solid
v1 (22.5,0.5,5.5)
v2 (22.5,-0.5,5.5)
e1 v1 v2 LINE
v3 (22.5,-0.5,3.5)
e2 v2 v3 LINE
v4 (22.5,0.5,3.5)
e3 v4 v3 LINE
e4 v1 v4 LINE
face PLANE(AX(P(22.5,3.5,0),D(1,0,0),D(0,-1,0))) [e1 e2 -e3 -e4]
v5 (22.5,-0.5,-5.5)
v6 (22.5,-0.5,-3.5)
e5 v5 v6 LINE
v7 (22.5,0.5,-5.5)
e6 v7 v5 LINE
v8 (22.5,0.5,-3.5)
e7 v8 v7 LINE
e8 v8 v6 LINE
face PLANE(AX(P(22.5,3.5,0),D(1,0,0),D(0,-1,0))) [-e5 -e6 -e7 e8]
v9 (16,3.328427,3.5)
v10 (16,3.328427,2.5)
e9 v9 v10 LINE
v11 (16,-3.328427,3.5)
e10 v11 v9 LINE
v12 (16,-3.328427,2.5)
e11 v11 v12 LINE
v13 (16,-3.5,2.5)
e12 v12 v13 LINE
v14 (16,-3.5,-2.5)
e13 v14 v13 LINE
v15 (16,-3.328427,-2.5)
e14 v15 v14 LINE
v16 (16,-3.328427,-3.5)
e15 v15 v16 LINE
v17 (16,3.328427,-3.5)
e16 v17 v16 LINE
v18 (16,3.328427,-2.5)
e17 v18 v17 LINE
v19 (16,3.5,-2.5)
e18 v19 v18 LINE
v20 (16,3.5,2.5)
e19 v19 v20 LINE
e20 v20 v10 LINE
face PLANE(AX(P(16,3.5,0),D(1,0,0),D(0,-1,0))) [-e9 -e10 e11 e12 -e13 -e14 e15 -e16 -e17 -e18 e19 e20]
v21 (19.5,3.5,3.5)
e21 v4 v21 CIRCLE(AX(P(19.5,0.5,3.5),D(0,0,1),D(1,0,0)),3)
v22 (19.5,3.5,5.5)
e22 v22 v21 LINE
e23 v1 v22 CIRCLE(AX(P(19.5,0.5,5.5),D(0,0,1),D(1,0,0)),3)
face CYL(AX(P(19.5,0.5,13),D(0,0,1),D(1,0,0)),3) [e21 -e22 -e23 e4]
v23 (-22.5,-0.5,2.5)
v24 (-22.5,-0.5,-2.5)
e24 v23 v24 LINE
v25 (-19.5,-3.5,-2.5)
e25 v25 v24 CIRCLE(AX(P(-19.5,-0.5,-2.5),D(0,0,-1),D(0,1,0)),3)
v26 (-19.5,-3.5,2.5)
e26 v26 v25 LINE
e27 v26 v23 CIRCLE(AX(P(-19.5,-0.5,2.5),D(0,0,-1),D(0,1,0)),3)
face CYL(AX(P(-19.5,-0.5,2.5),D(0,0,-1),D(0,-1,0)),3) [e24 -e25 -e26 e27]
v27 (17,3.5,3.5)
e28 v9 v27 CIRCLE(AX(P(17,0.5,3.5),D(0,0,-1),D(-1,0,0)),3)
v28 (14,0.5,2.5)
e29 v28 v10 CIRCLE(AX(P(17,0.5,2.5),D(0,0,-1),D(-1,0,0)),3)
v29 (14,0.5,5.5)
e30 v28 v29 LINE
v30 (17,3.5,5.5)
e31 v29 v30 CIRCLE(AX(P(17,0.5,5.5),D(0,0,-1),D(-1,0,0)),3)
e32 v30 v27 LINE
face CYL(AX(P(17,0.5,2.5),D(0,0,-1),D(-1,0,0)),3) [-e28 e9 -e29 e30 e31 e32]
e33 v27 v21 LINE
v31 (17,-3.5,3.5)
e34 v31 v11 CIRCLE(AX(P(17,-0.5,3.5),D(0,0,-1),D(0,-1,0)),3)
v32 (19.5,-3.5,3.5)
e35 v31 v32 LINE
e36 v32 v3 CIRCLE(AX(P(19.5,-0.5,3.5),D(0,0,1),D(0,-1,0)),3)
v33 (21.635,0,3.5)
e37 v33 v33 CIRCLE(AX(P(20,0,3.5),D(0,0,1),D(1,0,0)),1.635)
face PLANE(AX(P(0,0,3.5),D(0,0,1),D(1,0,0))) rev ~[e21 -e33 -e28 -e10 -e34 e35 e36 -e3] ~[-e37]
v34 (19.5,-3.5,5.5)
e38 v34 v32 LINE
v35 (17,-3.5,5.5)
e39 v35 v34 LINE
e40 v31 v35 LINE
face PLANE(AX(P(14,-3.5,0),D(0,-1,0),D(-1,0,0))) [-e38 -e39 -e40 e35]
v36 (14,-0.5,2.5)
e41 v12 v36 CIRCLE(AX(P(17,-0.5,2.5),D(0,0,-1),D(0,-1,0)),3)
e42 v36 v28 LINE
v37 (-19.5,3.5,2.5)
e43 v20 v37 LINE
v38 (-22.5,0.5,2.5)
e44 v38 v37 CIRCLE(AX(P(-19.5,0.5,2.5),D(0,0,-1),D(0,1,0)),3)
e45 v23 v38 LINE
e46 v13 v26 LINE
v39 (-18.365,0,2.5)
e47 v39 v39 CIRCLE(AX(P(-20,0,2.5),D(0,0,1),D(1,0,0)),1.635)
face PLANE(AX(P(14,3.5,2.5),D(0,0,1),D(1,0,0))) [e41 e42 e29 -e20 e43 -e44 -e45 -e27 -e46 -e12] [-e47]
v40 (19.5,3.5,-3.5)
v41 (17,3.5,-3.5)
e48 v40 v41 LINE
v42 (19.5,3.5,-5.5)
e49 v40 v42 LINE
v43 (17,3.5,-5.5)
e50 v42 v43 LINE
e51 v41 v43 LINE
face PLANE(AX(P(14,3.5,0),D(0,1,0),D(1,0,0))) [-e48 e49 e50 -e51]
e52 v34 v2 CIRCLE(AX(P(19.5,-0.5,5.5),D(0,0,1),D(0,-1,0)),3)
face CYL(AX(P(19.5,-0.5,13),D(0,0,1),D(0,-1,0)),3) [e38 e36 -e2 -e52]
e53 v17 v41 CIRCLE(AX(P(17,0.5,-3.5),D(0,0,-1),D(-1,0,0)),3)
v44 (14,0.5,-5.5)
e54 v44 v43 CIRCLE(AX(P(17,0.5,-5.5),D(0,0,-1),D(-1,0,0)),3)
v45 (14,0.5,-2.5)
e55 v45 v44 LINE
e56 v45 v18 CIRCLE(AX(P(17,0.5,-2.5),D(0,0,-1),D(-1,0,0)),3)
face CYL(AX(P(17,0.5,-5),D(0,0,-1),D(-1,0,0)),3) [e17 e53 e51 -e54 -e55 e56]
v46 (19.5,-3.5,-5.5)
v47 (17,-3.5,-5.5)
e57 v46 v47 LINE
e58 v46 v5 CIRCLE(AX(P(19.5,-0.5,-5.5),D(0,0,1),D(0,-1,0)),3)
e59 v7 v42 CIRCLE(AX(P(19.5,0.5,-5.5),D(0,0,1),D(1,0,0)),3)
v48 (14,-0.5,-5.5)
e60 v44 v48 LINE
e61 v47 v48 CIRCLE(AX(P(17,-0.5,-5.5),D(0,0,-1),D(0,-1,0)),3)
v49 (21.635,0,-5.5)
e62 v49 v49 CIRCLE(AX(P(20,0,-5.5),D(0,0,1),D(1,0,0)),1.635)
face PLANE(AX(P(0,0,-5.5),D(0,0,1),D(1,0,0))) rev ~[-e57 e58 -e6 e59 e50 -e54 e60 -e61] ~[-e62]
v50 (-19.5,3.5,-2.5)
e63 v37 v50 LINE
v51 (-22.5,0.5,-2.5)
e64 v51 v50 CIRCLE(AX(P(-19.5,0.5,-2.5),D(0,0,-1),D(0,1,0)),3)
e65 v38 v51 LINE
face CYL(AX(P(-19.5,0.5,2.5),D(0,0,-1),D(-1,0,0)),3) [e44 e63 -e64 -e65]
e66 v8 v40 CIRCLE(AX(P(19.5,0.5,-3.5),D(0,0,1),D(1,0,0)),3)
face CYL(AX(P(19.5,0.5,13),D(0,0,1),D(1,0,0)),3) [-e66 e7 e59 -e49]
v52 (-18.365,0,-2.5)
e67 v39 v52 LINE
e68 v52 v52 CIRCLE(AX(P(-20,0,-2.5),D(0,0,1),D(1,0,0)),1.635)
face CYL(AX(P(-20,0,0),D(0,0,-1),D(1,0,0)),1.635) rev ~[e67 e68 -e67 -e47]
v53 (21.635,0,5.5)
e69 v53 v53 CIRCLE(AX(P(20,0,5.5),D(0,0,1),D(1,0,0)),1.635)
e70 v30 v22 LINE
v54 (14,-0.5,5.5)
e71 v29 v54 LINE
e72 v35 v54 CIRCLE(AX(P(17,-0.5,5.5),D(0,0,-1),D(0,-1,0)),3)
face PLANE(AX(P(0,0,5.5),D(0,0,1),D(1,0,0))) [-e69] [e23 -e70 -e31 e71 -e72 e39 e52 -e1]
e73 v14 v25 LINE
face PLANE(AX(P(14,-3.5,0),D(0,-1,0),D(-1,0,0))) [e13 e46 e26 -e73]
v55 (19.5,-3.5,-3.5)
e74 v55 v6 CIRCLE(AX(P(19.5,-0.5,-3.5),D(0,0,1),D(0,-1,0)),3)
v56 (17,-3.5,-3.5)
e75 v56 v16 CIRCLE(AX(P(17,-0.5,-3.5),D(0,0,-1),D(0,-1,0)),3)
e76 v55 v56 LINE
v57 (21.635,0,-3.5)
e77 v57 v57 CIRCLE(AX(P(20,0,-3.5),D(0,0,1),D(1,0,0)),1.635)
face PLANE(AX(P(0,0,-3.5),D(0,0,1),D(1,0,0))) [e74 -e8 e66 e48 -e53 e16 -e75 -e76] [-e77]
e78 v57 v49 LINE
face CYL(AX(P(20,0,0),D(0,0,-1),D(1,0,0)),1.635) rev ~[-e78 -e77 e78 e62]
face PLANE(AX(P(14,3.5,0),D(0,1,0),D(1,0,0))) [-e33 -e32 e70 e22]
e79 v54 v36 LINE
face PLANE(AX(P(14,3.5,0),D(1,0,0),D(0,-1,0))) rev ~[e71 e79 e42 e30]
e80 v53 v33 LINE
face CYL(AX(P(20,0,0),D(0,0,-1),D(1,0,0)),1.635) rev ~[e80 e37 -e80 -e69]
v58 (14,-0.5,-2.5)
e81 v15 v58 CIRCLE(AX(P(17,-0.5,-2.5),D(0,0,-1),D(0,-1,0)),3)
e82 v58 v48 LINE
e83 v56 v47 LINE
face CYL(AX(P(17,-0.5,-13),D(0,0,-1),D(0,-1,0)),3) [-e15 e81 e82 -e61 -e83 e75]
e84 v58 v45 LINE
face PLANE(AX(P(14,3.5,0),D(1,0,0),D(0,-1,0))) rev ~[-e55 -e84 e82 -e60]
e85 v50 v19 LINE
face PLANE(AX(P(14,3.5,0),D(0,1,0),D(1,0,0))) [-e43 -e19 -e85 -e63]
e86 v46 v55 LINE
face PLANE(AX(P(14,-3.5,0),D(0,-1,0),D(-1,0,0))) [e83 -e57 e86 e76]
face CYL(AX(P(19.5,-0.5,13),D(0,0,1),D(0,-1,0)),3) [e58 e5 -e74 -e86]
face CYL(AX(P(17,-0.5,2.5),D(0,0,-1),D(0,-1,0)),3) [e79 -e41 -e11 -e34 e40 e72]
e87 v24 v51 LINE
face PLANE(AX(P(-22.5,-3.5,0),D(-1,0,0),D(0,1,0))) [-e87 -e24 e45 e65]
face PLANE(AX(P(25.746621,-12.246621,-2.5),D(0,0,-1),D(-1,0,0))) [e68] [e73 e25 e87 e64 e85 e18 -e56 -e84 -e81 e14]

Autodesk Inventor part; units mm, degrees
ref_plane "YZ Plane" through (0, 0, 0) normal (1, 0, 0) x (0, 1, 0)
ref_plane "XZ Plane" through (0, 0, 0) normal (0, 1, 0) x (-1, 0, 0)
ref_plane "XY Plane" through (0, 0, 0) normal (0, 0, 1) x (1, 0, 0)
sketch "スケッチ1" plane through (0, 0, 0) normal (0, 0, 1) x (1, 0, 0)
  line L0 (-22.5, 3.5) -> (22.5, 3.5)
  line L1 (22.5, 3.5) -> (22.5, -3.5)
  line L2 (22.5, -3.5) -> (-22.5, -3.5)
  line L3 (-22.5, -3.5) -> (-22.5, 3.5)
  line L4 (-22.5, 3.5) -> (22.5, -3.5) construction
  line L5 (22.5, 3.5) -> (-22.5, -3.5) construction
  line L6 (0, -6.37) -> (0, 6.37) construction
  line L7 (-34.37, 0) -> (34.37, 0) construction
  circle A0 centre (-20, 0) radius 4.55
  line L8 (22.5, -3.5) -> (22.5, 3.5)
  circle A1 centre (20, 0) radius 4.55
  circle A2 centre (-20, 0) radius 1.635
  circle A3 centre (20, 0) radius 1.635
  line L9 (14, 3.5) -> (14, -3.5)
  line L10 (16, 3.5) -> (16, -3.5)
  point P0 (0, 0)
  point P1 (-17.0927, 3.5)
  point P2 (-22.9073, 3.5)
  point P3 (-22.9073, -3.5)
  point P4 (-17.0927, -3.5)
  point P5 (17.0927, 3.5)
  point P6 (17.0927, -3.5)
  point P7 (22.9073, -3.5)
  point P8 (22.9073, 3.5)
  dimension "d1" = 7
  dimension "d2" = 20
  dimension "d3" = 45
  dimension "d4" = 9.1
  dimension "d12" = 3.27
  dimension "d13" = 3.27
  dimension "d14" = 6
  dimension "d15" = 2
extrude "押し出し1" add sketch "スケッチ1" along normal mid plane 5 contours L9 L2 A0 L0 | L0 L10 A1 L2 L9 | L0 A1 L10 | A0 L2 L3 L0 | L0 L1 L2 A1 L10 | L10 A1 | L10 A1 L2 picked at (-19.7985, 2.8744)
fillet "フィレット1" radius 3 4 edges at (-22.5, 3.5, 0) (-22.5, -3.5, 0) (22.5, -3.5, 0) (22.5, 3.5, 0)
extrude "押し出し3" add sketch "スケッチ1" along normal mid plane 11 contours L0 L10 A1 L2 L9 | L0 A1 L10 | L0 L1 L2 A1 L10 | L10 A1 | L10 A1 L2
extrude "押し出し4" cut sketch "スケッチ1" along normal mid plane 7 contours L0 A1 L10 | L0 L1 L2 A1 L10 | L10 A1 L2
fillet "フィレット2" radius 3 8 edges at (22.5, 3.5, 4.5) (22.5, -3.5, 4.5) (22.5, 3.5, -4.5) (22.5, -3.5, -4.5) (14, 3.5, 4) (14, -3.5, 4) (14, 3.5, -4) (14, -3.5, -4)
properties part number "link_arm_1"
